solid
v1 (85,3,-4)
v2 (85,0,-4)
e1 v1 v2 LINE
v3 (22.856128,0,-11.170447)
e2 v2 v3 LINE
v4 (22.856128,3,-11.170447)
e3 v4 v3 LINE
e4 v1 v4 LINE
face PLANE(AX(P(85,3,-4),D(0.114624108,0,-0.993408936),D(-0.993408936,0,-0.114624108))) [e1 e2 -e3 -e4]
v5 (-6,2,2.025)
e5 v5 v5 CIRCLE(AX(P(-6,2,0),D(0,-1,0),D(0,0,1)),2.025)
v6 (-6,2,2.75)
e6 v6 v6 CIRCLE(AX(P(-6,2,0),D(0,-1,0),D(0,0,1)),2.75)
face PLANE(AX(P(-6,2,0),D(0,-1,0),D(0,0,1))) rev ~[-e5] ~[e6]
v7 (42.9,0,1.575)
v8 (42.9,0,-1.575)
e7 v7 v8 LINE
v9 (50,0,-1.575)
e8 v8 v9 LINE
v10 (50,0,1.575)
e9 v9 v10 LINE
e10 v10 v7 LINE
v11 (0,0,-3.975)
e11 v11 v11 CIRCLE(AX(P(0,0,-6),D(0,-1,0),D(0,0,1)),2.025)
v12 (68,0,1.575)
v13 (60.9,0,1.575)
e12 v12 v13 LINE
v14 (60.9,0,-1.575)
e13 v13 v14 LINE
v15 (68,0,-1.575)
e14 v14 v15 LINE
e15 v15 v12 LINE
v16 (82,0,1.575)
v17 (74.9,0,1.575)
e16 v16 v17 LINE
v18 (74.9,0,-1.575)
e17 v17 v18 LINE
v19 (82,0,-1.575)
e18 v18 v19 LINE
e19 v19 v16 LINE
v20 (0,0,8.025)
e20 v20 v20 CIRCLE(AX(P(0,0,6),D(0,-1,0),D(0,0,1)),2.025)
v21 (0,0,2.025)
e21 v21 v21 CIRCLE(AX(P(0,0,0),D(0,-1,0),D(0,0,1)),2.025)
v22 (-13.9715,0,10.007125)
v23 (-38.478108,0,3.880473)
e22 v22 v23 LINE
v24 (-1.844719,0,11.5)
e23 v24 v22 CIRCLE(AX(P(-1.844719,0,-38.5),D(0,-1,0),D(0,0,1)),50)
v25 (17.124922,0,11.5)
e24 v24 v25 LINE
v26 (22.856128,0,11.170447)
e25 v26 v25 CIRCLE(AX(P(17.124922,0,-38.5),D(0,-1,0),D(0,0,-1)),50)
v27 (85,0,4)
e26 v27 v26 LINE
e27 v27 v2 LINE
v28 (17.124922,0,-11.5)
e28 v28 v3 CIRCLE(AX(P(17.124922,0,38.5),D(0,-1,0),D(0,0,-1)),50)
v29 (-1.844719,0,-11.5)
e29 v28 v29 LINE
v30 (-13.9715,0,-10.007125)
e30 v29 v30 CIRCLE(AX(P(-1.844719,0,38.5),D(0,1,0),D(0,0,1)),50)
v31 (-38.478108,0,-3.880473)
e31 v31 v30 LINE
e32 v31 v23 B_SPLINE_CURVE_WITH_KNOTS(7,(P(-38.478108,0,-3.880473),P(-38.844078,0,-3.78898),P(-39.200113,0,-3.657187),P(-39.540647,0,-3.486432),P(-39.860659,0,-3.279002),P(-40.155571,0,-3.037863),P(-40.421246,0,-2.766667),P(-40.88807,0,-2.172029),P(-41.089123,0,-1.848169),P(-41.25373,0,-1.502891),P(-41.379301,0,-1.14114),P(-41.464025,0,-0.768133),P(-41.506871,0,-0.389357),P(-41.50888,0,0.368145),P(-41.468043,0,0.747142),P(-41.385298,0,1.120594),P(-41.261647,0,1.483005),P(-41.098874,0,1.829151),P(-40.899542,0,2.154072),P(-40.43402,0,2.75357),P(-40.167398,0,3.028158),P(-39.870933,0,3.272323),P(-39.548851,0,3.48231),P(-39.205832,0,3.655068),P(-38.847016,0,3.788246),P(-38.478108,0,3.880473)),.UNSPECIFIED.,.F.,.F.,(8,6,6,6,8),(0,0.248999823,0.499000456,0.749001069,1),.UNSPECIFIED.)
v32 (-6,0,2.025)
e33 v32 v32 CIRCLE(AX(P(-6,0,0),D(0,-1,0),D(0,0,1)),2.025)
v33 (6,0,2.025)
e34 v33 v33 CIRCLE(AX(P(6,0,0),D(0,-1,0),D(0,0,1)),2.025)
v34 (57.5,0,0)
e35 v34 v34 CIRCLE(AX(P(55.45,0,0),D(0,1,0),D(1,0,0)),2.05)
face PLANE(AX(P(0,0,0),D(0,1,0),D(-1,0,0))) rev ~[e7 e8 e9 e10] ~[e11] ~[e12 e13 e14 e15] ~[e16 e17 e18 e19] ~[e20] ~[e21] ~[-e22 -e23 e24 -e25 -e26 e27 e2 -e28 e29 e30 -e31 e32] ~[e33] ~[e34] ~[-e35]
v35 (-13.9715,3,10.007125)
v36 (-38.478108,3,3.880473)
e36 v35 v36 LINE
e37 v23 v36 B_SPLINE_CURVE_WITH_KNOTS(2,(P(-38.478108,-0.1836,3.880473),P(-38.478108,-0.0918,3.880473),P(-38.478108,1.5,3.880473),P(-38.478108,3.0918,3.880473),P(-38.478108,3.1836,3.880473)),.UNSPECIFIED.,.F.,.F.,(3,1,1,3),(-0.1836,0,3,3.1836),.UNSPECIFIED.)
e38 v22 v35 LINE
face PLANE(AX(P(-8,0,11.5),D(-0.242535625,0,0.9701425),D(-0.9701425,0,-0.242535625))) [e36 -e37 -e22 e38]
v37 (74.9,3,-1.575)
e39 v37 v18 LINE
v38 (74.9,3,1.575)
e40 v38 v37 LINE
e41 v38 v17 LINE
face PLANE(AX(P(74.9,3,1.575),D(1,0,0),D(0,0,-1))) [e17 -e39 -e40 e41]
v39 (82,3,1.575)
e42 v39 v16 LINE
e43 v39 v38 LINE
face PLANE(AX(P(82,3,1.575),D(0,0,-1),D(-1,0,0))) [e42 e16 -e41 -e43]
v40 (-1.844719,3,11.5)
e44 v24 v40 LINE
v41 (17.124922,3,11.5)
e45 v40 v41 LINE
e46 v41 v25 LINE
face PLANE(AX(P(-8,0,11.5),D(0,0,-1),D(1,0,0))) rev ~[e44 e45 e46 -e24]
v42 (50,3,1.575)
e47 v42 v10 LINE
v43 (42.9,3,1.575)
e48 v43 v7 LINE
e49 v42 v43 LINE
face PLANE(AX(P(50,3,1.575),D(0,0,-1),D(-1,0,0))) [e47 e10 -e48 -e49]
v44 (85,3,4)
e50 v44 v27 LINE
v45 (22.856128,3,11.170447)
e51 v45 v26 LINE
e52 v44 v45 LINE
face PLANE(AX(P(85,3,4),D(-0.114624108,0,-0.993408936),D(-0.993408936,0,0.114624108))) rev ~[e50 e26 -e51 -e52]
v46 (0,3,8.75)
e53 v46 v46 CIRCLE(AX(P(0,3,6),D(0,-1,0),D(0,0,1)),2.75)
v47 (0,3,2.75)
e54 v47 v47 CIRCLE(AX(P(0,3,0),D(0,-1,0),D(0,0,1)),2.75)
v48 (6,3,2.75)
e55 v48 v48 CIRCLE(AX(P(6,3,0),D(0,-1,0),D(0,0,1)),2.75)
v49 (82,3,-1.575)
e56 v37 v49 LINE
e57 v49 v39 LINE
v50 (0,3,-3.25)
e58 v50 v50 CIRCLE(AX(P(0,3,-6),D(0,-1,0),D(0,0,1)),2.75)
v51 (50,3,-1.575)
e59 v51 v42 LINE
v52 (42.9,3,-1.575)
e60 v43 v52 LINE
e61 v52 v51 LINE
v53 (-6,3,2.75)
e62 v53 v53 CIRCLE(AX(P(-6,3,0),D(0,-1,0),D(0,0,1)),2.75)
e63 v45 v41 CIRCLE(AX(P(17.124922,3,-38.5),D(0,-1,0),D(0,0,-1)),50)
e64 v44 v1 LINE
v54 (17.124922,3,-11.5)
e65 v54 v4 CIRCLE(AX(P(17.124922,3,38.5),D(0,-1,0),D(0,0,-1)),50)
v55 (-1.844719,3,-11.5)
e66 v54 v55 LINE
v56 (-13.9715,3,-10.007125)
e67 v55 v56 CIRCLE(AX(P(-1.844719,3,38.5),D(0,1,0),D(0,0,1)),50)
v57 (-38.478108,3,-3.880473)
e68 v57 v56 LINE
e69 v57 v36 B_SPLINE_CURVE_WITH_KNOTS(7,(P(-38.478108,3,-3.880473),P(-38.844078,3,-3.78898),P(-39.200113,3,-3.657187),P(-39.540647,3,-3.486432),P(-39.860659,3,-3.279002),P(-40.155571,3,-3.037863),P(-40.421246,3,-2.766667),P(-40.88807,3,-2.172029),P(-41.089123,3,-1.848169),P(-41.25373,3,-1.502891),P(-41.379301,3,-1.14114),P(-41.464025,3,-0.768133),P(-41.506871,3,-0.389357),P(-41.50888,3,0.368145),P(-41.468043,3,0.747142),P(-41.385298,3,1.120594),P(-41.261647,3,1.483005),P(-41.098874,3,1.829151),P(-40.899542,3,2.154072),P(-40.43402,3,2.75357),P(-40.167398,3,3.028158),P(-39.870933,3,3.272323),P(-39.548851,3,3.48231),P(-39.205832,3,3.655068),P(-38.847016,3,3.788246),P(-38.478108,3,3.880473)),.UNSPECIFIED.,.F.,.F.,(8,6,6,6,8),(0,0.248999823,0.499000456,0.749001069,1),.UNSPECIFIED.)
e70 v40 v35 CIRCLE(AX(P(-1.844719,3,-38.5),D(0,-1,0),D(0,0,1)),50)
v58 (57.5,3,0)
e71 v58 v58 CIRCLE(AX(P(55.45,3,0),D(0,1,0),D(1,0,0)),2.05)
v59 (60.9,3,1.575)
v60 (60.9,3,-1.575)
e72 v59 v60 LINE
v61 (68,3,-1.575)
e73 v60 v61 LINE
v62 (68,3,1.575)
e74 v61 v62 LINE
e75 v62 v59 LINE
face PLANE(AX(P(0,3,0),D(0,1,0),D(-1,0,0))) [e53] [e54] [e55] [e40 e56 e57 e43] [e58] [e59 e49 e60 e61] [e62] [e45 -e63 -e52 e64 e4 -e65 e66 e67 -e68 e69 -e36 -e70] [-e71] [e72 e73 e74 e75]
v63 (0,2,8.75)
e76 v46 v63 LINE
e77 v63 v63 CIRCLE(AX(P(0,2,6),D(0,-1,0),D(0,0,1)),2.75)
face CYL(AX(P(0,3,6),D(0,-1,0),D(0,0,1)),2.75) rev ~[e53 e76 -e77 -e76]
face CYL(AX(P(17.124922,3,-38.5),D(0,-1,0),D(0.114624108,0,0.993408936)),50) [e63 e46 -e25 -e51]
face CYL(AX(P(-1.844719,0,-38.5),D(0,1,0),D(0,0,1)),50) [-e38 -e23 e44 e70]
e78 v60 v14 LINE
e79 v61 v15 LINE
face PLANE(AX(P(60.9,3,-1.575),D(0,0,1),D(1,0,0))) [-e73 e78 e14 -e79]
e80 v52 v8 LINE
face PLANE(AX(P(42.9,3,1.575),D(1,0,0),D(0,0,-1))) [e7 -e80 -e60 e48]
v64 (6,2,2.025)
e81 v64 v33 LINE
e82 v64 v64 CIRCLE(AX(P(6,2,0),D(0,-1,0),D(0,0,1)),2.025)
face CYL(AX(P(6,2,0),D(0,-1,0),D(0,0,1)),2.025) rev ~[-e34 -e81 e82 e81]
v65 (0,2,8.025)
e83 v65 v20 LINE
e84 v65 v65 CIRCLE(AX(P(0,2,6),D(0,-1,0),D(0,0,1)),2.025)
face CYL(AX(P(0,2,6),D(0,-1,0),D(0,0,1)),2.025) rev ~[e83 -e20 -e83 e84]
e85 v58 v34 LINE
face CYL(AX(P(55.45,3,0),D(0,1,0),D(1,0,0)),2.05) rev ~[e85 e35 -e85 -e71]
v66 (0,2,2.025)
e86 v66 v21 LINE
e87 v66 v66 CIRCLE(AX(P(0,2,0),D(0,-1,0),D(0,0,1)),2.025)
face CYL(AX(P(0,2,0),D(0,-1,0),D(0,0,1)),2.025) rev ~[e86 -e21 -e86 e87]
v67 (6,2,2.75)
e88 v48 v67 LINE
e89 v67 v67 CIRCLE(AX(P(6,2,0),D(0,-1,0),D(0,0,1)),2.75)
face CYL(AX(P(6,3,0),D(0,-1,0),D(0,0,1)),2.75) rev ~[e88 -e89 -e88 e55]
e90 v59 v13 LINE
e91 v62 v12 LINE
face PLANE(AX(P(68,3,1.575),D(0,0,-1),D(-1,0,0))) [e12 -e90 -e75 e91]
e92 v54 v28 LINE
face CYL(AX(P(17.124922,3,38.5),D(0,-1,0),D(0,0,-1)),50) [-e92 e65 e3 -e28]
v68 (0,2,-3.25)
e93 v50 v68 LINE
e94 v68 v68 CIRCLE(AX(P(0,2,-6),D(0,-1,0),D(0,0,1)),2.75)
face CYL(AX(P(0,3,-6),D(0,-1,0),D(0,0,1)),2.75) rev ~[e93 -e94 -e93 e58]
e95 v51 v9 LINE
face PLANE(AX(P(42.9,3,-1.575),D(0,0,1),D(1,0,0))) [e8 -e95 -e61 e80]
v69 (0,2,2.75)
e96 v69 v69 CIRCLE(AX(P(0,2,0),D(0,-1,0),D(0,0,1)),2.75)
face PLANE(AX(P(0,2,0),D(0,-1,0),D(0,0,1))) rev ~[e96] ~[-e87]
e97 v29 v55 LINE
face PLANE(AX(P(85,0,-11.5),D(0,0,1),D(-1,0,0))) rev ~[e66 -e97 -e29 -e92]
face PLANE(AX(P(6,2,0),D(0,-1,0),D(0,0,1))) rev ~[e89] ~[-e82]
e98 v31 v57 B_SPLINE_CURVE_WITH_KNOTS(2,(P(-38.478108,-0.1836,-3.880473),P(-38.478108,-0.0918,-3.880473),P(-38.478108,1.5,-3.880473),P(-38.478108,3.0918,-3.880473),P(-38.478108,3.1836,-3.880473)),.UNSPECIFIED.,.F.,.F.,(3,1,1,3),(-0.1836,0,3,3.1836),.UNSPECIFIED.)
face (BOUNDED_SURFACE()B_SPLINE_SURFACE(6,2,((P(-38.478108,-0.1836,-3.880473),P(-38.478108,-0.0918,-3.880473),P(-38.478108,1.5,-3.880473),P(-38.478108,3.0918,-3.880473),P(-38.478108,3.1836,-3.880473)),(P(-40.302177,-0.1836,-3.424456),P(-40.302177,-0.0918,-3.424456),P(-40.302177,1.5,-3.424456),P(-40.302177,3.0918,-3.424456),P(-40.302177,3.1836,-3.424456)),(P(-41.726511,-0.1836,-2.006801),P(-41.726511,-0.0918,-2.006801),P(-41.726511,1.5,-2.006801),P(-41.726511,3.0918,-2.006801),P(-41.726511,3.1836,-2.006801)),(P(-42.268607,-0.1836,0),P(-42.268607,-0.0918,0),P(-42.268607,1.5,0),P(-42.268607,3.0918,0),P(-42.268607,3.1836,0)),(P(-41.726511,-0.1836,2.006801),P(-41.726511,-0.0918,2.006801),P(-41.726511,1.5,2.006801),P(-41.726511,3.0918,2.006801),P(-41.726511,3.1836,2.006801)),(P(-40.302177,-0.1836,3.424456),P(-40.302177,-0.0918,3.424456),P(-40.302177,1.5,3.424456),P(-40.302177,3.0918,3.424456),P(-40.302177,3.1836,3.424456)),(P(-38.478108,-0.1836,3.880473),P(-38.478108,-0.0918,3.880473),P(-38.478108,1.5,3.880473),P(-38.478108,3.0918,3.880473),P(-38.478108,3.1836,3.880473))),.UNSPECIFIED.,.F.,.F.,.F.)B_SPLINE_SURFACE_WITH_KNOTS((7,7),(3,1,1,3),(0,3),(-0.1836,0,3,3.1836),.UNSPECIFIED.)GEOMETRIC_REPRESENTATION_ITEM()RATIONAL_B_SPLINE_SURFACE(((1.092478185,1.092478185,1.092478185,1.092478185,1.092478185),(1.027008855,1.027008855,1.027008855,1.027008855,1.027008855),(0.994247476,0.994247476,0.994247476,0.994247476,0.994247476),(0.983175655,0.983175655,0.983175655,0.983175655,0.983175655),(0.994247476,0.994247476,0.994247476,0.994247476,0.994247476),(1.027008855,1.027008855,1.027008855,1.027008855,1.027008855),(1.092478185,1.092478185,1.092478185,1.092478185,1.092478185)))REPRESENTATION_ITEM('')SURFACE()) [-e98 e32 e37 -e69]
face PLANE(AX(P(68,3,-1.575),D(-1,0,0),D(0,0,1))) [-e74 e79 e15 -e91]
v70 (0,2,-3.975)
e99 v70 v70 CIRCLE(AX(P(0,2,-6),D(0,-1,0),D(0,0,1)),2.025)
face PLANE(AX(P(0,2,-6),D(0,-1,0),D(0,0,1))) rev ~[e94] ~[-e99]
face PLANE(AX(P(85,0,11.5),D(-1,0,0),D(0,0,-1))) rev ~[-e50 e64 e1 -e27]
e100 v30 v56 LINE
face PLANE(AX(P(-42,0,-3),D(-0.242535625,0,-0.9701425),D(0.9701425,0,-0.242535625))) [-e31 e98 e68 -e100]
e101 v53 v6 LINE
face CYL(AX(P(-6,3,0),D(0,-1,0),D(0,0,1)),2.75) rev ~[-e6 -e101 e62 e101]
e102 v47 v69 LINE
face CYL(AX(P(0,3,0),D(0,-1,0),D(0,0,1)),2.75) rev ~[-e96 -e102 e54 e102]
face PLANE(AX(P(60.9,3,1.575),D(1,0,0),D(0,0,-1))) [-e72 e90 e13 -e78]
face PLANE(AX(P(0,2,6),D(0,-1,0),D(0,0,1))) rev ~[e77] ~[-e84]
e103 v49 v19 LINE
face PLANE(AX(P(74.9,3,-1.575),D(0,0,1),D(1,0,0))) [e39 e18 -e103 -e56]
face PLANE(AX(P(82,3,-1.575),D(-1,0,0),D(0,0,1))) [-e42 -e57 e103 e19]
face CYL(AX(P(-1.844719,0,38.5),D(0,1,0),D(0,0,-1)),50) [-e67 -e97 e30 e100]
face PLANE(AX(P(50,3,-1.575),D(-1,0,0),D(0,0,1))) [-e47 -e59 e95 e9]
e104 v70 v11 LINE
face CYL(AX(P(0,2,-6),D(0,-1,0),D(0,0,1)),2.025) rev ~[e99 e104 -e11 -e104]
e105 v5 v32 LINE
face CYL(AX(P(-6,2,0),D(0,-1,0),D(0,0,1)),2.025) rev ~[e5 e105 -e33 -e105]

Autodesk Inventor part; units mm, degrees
ref_plane "YZ Plane" through (0, 0, 0) normal (1, 0, 0) x (0, 1, 0)
ref_plane "XZ Plane" through (0, 0, 0) normal (0, 1, 0) x (-1, 0, 0)
ref_plane "XY Plane" through (0, 0, 0) normal (0, 0, 1) x (1, 0, 0)
sketch "Esquisse1" plane through (0, 0, 0) normal (0, 1, 0) x (-1, 0, 0)
  line L0 (8, 11.5) -> (-85, 11.5)
  line L1 (-85, 11.5) -> (-85, -11.5)
  line L2 (-85, -11.5) -> (8, -11.5)
  line L3 (8, -11.5) -> (8, 11.5)
  line L4 (0, 11.5) -> (0, -11.5) construction
  line L5 (8, 11.5) -> (42, 3)
  line L6 (42, 3) -> (42, -3)
  line L7 (42, -3) -> (8, -11.5)
  point P0 (0, 0)
  point P1 (0, 0)
  dimension "d0" = 23
  dimension "d1" = 8
  dimension "d3" = 85
  dimension "d4" = 42
  dimension "d5" = 6
extrude "Plaque1" add sketch "Esquisse1" along normal blind 3
sketch "Esquisse2" plane through (0, 3, 0) normal (0, 1, 0) x (1, 0, 0)
  line L0 (0, 0) -> (-6, 0) construction
  point P0 (0, -6)
  point P1 (6, 0)
  point P2 (0, 6)
  dimension "d9" = 360
  dimension "d11" = 6
hole "Perçage1" at (0, 3, 0) at (-6, 3, 0) at (0, 3, 6) at (6, 3, 0) at (0, 3, -6) direction (0, -1, 0) diameter 4.05 end through all counterbore diameter 5.5 counterbore depth 1
sketch "Esquisse3" plane through (0, 3, 0) normal (0, 1, 0) x (1, 0, 0)
  circle A0 centre (6, 0) radius 2.75 construction
  circle A1 centre (-6, 0) radius 2.75 construction
  circle A2 centre (0, 0) radius 2.75 construction
  circle A3 centre (0, -6) radius 2.75 construction
  circle A4 centre (0, 6) radius 2.75 construction
  line L0 (-8, -11.5) -> (-42, -3) construction
  line L1 (85, -11.5) -> (-8, -11.5) construction
  line L2 (85, 11.5) -> (85, -11.5) construction
  line L3 (-8, 11.5) -> (85, 11.5) construction
  line L4 (-42, 3) -> (-8, 11.5) construction
  line L5 (-42, -3) -> (-42, 3) construction
  line L6 (85, -11.5) -> (85, 11.5) projected
  line L7 (85, -4) -> (20, -11.5)
  line L8 (85, -11.5) -> (85, -4)
  line L9 (85, -11.5) -> (20, -11.5)
  line L10 (-8, -11.5) -> (85, -11.5) projected
  line L11 (85, 0) -> (18.7328, 0) construction
  line L12 (85, 4) -> (20, 11.5)
  line L13 (85, 11.5) -> (85, 4)
  line L14 (85, 11.5) -> (20, 11.5)
  dimension "d19" = 8
  dimension "d20" = 65
extrude "Couper1" cut sketch "Esquisse3" against normal through all
fillet "Congé1" radius 50 4 edges at (20, 1.5, 11.5) (-8, 1.5, 11.5) (20, 1.5, -11.5) (-8, 1.5, -11.5)
fillet "Congé2" radius 4 2 edges at (-42, 1.5, -3) (-42, 1.5, 3)
sketch "Esquisse4" plane through (0, 3, 0) normal (0, 1, 0) x (1, 0, 0)
  arc A0 (-38.4777, 3.8806) -> (-38.4777, -3.8806) centre (-37.5076, 0) ccw construction
  arc A1 (-13.9715, -10.0071) -> (-1.8447, -11.5) centre (-1.8447, 38.5) ccw construction
  line L0 (17.1249, -11.5) -> (-1.8447, -11.5) construction
  arc A2 (17.1249, -11.5) -> (22.8561, -11.1704) centre (17.1249, 38.5) ccw construction
  line L1 (22.8561, -11.1704) -> (85, -4) construction
  line L2 (85, 4) -> (85, -4) construction
  line L3 (85, 4) -> (22.8561, 11.1704) construction
  arc A3 (22.8561, 11.1704) -> (17.1249, 11.5) centre (17.1249, -38.5) ccw construction
  line L4 (-1.8447, 11.5) -> (17.1249, 11.5) construction
  arc A4 (-1.8447, 11.5) -> (-13.9715, 10.0071) centre (-1.8447, -38.5) ccw construction
  circle A5 centre (0, 6) radius 2.75 construction
  circle A6 centre (0, -6) radius 2.75 construction
  circle A7 centre (0, 0) radius 2.75 construction
  circle A8 centre (-6, 0) radius 2.75 construction
  circle A9 centre (6, 0) radius 2.75 construction
  line L5 (85, -4) -> (85, 4) construction
  line L6 (85, 4) -> (85, -4) construction
  line L7 (85, 0) -> (71.2936, 0) construction
  line L8 (74.9, 1.575) -> (82, 1.575)
  line L9 (82, 1.575) -> (82, -1.575)
  line L10 (82, -1.575) -> (74.9, -1.575)
  line L11 (74.9, -1.575) -> (74.9, 1.575)
  line L12 (74.9, 0) -> (82, 0) construction
  line L13 (71, 0) -> (57.2936, 0) construction
  line L14 (60.9, 1.575) -> (68, 1.575)
  line L15 (68, 1.575) -> (68, -1.575)
  line L16 (68, -1.575) -> (60.9, -1.575)
  line L17 (60.9, -1.575) -> (60.9, 1.575)
  line L18 (60.9, 0) -> (68, 0) construction
  line L19 (67, 0) -> (53.2936, 0) construction
  line L20 (42.9, -1.575) -> (42.9, 1.575)
  line L21 (50, 1.575) -> (50, -1.575)
  line L22 (50, -1.575) -> (42.9, -1.575)
  line L23 (42.9, 0) -> (50, 0) construction
  line L24 (53, 0) -> (39.2936, 0) construction
  line L25 (42.9, 1.575) -> (50, 1.575)
  line L26 (50, 0) -> (60.9, 0) construction
  circle A10 centre (55.45, 0) radius 2.05
  line L27 (-13.9715, -10.0071) -> (-38.4777, -3.8806) projected
  line L28 (-38.4777, 3.8806) -> (-13.9715, 10.0071) projected
  point P0 (61.8782, 0)
  dimension "d46" = 3.15
  dimension "d47" = 3
  dimension "d48" = 7.1
  dimension "d51" = 14
  dimension "d58" = 18
  dimension "d63" = 4.1
extrude "Couper2" cut sketch "Esquisse4" against normal blind 3
equation "\"d12\" = ollo_hole"
equation "\"d14\" = ollo_ring"
equation "\"d15\" = ollo_depth"
equation "\"d17\" = Epaisseur"
equation "\"d21\" = Epaisseur"
equation "\"d44\" = Epaisseur"
equation "\"LargeurGrugeage\" = Epaisseur"
equation "\"ProfondeurGrugeage\" = 0.5 * Epaisseur"
equation "\"TailleGrugeage\" = 4 * Epaisseur"
equation "\"RestesMinimum\" = 2 * Epaisseur"
equation "\"Rayondetransition\" = RayonPli"
equation "\"TailleRayonJacobi\" = RayonPli"
equation "\"TailleJeu\" = Epaisseur"
equation "\"d6\" = RayonPli"
equation "\"ollo_hole\" = 4.05"
equation "\"ollo_ring\" = 5.5"
equation "\"ollo_depth\" = 1"
equation "\"Epaisseur\" = 3"
equation "\"RayonPli\" = 4"
properties part number "leg" material "Plastique PMMA"
